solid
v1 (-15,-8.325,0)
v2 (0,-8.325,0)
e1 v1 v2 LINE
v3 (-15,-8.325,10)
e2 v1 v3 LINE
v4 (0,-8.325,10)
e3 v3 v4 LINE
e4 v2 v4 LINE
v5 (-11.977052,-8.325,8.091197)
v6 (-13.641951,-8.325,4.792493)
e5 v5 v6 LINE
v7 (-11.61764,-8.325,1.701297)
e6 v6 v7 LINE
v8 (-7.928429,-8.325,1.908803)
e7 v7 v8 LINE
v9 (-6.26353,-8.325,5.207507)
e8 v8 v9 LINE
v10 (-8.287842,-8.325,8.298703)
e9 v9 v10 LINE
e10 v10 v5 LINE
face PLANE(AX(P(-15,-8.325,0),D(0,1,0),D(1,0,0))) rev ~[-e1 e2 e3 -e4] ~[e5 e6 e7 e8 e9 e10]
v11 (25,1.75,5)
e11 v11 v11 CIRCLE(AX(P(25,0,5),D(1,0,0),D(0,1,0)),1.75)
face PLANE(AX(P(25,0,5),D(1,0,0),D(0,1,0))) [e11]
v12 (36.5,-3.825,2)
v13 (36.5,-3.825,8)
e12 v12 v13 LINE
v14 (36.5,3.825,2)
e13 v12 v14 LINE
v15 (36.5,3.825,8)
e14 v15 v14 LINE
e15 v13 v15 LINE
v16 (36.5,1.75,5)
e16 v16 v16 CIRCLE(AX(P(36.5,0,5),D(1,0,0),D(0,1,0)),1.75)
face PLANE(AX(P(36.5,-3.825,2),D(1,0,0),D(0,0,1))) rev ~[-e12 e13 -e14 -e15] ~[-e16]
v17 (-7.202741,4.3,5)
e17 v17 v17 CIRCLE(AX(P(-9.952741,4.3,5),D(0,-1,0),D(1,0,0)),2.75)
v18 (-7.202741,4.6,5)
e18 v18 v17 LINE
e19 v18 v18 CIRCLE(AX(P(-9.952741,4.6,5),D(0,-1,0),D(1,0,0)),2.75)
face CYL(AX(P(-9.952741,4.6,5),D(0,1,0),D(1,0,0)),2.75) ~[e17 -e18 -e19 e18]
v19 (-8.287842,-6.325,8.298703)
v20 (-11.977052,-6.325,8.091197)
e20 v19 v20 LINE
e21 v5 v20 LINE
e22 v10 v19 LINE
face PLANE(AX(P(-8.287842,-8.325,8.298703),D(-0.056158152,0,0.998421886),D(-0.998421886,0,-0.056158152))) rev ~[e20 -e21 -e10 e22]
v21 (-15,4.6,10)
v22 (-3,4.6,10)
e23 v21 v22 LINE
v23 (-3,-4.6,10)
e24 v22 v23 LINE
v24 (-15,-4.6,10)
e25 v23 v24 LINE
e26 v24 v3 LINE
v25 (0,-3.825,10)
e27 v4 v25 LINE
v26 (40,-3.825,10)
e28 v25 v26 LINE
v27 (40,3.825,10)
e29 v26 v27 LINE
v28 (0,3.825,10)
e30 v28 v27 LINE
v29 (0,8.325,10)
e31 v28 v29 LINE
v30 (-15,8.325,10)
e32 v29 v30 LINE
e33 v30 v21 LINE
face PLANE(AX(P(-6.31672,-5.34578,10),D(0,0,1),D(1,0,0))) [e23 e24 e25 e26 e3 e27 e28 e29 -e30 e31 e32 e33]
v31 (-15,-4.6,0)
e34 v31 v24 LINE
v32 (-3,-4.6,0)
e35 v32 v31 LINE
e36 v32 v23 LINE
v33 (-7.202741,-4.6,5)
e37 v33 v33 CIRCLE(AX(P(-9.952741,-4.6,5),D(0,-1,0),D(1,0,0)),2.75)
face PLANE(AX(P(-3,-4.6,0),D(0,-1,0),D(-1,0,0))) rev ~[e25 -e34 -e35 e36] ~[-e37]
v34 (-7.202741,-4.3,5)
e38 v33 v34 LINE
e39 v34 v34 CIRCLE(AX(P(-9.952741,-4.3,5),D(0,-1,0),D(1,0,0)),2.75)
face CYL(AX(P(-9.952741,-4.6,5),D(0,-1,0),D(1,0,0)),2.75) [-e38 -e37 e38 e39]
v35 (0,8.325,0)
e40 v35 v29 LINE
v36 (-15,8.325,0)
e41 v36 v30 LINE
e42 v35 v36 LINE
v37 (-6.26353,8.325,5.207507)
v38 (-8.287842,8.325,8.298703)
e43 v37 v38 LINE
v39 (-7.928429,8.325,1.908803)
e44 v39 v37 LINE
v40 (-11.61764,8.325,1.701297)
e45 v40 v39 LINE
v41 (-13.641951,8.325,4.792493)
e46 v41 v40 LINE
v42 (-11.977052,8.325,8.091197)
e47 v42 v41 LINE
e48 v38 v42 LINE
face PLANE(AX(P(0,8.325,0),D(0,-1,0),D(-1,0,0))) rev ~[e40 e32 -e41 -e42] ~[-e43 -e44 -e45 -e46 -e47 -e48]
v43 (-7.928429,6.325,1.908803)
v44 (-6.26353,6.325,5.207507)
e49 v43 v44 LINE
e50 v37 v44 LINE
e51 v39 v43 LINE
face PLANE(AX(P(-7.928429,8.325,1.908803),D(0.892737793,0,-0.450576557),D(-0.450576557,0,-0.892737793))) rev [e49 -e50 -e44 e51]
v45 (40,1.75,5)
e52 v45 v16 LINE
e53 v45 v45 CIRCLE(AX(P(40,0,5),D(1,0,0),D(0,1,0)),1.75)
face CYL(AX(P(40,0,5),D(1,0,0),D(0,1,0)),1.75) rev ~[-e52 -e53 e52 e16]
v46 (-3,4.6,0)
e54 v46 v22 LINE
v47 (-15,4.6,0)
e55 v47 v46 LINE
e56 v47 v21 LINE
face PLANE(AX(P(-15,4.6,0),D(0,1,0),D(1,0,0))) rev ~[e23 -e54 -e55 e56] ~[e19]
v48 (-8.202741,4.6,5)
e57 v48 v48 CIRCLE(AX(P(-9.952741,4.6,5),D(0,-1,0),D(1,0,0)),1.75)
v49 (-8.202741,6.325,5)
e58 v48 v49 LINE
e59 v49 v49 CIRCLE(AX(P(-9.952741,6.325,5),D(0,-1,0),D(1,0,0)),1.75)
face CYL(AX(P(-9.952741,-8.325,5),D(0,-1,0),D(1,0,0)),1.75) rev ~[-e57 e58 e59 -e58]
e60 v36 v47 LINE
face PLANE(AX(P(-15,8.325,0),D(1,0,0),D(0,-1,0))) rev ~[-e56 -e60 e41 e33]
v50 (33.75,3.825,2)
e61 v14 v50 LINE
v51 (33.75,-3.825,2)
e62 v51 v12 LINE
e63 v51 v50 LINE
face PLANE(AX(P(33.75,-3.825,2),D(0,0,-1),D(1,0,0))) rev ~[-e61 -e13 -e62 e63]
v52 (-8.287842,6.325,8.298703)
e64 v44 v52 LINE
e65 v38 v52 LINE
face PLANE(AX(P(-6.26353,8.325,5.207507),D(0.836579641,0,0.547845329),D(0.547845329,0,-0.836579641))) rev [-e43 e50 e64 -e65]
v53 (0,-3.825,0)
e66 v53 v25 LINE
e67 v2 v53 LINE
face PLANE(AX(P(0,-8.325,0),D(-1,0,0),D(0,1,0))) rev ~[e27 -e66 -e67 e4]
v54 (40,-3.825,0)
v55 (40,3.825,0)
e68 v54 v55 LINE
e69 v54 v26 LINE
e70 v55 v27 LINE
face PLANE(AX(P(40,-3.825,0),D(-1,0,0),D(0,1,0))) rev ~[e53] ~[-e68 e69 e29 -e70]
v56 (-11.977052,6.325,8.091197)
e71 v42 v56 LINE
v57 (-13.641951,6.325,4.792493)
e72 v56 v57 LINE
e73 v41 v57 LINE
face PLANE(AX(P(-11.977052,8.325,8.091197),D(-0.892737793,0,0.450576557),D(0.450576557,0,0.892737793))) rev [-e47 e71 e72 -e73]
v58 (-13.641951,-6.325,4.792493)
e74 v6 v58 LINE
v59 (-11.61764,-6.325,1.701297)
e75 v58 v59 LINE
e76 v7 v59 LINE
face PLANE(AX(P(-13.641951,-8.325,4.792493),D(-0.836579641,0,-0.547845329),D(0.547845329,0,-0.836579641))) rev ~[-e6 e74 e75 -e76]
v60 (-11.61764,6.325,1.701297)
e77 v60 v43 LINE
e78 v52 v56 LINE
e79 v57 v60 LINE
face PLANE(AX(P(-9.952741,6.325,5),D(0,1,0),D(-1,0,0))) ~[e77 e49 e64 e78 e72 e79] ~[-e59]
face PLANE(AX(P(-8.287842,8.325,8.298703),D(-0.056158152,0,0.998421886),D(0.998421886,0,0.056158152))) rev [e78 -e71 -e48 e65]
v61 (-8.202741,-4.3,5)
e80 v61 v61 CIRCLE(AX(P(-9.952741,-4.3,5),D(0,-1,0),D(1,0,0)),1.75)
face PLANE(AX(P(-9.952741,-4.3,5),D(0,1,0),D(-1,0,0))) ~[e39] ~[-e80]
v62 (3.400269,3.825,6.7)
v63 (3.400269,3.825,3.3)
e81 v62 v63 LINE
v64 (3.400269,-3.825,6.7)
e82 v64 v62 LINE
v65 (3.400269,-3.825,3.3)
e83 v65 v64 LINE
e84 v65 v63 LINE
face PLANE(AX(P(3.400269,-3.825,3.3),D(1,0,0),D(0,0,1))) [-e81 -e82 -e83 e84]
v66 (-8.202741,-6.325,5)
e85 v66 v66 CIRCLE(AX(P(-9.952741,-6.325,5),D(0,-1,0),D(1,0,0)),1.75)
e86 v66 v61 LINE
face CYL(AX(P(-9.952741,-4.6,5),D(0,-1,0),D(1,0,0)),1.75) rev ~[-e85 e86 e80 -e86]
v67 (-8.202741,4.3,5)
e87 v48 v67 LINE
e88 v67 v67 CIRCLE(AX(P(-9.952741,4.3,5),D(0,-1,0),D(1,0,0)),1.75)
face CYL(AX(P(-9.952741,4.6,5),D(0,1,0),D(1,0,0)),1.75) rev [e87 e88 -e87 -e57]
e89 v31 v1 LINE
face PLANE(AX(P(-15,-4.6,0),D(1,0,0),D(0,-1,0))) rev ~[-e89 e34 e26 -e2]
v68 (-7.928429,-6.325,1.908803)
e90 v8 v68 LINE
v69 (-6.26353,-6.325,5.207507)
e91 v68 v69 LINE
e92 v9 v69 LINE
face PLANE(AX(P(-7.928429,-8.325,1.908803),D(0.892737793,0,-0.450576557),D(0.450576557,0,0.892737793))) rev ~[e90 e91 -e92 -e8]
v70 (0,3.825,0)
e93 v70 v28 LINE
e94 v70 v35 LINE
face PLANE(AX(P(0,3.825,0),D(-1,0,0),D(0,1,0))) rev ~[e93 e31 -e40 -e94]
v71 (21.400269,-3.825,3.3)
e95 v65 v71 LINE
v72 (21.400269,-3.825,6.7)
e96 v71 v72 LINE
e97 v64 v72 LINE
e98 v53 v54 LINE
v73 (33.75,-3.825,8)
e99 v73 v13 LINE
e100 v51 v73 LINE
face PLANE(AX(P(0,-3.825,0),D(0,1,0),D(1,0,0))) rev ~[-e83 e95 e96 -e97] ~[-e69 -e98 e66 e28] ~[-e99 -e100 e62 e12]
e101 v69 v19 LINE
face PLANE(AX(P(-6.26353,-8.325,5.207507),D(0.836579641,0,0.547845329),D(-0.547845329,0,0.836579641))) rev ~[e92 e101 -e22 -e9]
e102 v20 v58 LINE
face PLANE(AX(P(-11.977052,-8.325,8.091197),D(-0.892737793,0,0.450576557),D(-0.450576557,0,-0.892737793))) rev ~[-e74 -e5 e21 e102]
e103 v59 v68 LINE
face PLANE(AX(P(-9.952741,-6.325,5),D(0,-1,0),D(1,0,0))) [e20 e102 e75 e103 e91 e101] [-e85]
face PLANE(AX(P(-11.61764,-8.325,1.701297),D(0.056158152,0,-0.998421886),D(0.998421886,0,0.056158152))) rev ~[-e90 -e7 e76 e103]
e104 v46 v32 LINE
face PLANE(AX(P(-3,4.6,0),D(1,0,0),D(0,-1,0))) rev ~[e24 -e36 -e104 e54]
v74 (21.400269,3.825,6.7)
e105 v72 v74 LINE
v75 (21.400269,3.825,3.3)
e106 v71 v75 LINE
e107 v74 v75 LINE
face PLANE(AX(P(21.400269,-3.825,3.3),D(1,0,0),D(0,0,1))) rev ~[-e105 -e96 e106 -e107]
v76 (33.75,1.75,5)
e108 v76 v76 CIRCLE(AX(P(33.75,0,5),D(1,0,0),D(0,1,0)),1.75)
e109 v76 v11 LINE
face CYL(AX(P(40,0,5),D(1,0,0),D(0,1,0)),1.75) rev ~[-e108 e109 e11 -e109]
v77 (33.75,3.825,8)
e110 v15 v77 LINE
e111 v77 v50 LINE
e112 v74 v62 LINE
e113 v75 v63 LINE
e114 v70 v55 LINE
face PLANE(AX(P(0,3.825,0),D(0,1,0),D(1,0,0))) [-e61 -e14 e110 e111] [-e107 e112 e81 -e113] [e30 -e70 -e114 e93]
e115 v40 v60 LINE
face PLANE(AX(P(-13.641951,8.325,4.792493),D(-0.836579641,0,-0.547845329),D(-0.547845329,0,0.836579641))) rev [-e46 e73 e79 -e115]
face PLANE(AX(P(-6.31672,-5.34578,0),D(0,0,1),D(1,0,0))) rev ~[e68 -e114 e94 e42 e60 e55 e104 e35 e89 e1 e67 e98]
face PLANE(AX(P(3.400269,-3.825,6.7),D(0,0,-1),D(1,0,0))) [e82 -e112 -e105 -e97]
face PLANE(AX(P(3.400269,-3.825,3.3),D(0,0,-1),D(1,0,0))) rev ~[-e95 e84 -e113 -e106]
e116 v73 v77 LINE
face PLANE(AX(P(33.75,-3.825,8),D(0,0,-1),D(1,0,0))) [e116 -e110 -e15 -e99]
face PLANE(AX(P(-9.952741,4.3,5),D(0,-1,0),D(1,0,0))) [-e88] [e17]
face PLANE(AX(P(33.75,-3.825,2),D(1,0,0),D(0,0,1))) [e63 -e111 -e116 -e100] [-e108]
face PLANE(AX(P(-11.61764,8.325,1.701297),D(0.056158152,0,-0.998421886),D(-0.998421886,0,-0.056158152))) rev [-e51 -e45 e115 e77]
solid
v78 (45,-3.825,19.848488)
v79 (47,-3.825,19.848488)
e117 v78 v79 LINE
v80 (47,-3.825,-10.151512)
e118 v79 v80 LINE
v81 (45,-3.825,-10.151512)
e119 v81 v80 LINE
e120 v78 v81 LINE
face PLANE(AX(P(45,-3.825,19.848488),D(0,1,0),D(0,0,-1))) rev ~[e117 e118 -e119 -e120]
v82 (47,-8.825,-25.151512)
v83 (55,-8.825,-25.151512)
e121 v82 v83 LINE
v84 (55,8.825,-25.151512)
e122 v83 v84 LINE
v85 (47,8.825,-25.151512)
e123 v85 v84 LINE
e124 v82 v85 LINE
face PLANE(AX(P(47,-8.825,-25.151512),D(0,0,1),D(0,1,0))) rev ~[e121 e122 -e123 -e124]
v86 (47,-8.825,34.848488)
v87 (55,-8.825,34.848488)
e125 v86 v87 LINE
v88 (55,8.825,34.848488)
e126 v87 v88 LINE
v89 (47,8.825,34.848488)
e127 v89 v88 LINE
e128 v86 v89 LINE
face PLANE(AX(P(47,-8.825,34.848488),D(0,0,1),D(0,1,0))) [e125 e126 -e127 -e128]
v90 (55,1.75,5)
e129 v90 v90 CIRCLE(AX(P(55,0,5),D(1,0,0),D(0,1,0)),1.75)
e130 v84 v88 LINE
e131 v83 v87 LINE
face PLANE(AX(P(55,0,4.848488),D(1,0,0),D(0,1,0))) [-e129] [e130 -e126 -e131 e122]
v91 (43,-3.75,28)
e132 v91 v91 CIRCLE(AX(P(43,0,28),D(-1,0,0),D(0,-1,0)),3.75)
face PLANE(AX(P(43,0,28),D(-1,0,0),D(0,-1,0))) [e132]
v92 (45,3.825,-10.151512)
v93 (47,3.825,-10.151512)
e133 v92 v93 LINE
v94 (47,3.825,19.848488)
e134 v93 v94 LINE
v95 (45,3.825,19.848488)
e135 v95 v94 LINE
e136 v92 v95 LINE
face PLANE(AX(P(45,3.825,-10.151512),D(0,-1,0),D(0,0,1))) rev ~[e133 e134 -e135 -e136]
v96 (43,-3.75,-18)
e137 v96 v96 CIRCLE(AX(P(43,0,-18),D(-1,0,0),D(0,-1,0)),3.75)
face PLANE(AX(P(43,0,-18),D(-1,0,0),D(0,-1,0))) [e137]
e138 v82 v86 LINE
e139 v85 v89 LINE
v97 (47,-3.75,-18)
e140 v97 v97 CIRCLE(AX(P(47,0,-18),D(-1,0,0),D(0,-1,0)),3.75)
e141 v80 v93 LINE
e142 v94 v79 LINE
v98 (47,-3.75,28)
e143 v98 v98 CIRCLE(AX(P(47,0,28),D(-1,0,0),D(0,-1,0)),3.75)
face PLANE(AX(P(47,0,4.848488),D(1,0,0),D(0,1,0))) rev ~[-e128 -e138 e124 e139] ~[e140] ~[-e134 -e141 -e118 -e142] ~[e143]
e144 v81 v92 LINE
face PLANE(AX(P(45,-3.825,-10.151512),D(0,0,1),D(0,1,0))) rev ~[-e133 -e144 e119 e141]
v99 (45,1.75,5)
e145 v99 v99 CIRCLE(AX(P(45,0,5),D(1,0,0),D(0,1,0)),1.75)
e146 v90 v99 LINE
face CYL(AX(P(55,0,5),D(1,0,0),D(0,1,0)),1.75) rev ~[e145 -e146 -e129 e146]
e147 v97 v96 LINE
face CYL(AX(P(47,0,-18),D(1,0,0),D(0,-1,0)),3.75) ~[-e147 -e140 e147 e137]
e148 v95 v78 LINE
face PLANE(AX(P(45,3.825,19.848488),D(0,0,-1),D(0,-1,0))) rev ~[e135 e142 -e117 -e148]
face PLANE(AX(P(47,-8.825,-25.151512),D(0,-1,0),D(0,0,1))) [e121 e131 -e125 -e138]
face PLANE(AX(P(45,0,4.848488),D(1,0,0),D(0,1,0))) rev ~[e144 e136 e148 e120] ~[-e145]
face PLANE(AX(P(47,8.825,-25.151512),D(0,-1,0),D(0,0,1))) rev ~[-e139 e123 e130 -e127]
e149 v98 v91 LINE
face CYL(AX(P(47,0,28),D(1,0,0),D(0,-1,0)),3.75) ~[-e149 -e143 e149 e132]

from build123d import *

# Parameters (mm, degrees)
F0_W      = 40
F0_H      = 3.825
F1_DEPTH  = 10
F2_R      = 1.75
F3_DEPTH  = 16.651
F4_W      = 18
F4_H      = 3.4
F4_W_2    = 2.75
F4_H_2    = 6
F5_DEPTH  = 12.151
F6_R      = 1.75
F7_DEPTH  = 15
F10_DEPTH = 2
F11_W     = 17.65
F11_H     = 60
F12_DEPTH = 8
F13_R     = 1.75
F14_DEPTH = 70.001
F15_R     = 2.75
F15_R_2   = 1.75
F16_DEPTH = 0.3
F17_R     = 1.75
F18_DEPTH = 2
F19_R     = 3.75
F20_DEPTH = 4


# Not quite as in the source:
# - a pattern or mirror of a feature is missing from the dataset's text; its kind, count and spacing are read off the source's solid


with BuildPart() as f1:
    # F0 (on Top) → F1 (new body)
    with BuildSketch(Plane.XY):
        Polygon((0, -3.825), (0, 0), (-3, 0), (-3, -4.6), (-15, -4.6), (-15, -8.325), (0, -8.325), align=None)
        Polygon((-3, 0), (0, 0), (0, 3.825), (0, 8.325), (-15, 8.325), (-15, 4.6), (-3, 4.6), align=None)
        with Locations((20, 1.9125)):
            Rectangle(F0_W, F0_H)
        with Locations((20, -1.9125)):
            Rectangle(F0_W, F0_H)
    extrude(amount=F1_DEPTH)

    # F2 (on face) → F3 (cut, through all)
    with BuildSketch(Plane.XZ.offset(8.325)):
        with Locations((-9.9527407438, 5)):
            Circle(F2_R)
    extrude(amount=-F3_DEPTH, mode=Mode.SUBTRACT)

    # F4 (on face) → F5 (cut, through all)
    with BuildSketch(Plane.XZ.offset(3.825)):
        with Locations((12.4002694301, 5)):
            Rectangle(F4_W, F4_H)
        with Locations((35.125, 5)):
            Rectangle(F4_W_2, F4_H_2)
    extrude(amount=-F5_DEPTH, mode=Mode.SUBTRACT)

    # F6 (on face) → F7 (cut)
    with BuildSketch(Plane.YZ.offset(40)):
        with Locations((0, 5)):
            Circle(F6_R)
    extrude(amount=-F7_DEPTH, mode=Mode.SUBTRACT)

    # F15 (on face) → F16 (join)
    with BuildSketch(Plane.XZ.offset(-4.6)):
        with Locations((-9.9527407438, 5)):
            Circle(F15_R)
        with Locations((-9.9527407438, 5)):
            Circle(F15_R_2, mode=Mode.SUBTRACT)
    f16 = extrude(amount=F16_DEPTH)

    # F16_copies: F16 across plane
    add(f16.mirror(Plane(origin=(0, 0, 0), x_dir=(0, 0, -1), z_dir=(0, -1, 0))))

    # F17 (on face) → F18 (cut)
    with BuildSketch(Plane.XZ.offset(8.325)):
        Polygon((-7.9284293953, 1.9088033227), (-6.2635302189, 5.2075067143), (-8.2878415673, 8.2987033916), (-11.9770520922, 8.0911966773), (-13.6419512686, 4.7924932857), (-11.6176399202, 1.7012966084), align=None)
        with Locations((-9.9527407438, 5)):
            Circle(F17_R, mode=Mode.SUBTRACT)
    f18 = extrude(amount=-F18_DEPTH, mode=Mode.SUBTRACT)

    # F18_copies: F18 across plane
    add(f18.mirror(Plane.ZX), mode=Mode.SUBTRACT)


with BuildPart() as f10:
    # F9 (on offset) → F10 (new body)
    with BuildSketch(Plane.YZ.offset(45)):
        Polygon((3.825, 0), (3.825, 10), (3.825, 19.8484882712), (-3.825, 19.8484882712), (-3.825, 10), (-3.825, 0), (-3.825, -10.1515117288), (3.825, -10.1515117288), align=None)
    extrude(amount=F10_DEPTH)

    # F11 (on face) → F12 (join)
    with BuildSketch(Plane.YZ.offset(47)):
        with Locations((0, 4.8484882712)):
            Rectangle(F11_W, F11_H)
    extrude(amount=F12_DEPTH)

    # F13 (on face) → F14 (cut, through all)
    with BuildSketch(Plane.YZ.offset(55)):
        with Locations((0, 5)):
            Circle(F13_R)
    extrude(amount=-F14_DEPTH, mode=Mode.SUBTRACT)

    # F19 (on face) → F20 (join)
    with BuildSketch(Plane(origin=(47, 0, 0), x_dir=(0, -1, 0), z_dir=(-1, 0, 0))):
        with Locations((0, 28)):
            Circle(F19_R)
        with Locations((0, -18)):
            Circle(F19_R)
    extrude(amount=F20_DEPTH)


solid = Compound([f1.part, f10.part])
